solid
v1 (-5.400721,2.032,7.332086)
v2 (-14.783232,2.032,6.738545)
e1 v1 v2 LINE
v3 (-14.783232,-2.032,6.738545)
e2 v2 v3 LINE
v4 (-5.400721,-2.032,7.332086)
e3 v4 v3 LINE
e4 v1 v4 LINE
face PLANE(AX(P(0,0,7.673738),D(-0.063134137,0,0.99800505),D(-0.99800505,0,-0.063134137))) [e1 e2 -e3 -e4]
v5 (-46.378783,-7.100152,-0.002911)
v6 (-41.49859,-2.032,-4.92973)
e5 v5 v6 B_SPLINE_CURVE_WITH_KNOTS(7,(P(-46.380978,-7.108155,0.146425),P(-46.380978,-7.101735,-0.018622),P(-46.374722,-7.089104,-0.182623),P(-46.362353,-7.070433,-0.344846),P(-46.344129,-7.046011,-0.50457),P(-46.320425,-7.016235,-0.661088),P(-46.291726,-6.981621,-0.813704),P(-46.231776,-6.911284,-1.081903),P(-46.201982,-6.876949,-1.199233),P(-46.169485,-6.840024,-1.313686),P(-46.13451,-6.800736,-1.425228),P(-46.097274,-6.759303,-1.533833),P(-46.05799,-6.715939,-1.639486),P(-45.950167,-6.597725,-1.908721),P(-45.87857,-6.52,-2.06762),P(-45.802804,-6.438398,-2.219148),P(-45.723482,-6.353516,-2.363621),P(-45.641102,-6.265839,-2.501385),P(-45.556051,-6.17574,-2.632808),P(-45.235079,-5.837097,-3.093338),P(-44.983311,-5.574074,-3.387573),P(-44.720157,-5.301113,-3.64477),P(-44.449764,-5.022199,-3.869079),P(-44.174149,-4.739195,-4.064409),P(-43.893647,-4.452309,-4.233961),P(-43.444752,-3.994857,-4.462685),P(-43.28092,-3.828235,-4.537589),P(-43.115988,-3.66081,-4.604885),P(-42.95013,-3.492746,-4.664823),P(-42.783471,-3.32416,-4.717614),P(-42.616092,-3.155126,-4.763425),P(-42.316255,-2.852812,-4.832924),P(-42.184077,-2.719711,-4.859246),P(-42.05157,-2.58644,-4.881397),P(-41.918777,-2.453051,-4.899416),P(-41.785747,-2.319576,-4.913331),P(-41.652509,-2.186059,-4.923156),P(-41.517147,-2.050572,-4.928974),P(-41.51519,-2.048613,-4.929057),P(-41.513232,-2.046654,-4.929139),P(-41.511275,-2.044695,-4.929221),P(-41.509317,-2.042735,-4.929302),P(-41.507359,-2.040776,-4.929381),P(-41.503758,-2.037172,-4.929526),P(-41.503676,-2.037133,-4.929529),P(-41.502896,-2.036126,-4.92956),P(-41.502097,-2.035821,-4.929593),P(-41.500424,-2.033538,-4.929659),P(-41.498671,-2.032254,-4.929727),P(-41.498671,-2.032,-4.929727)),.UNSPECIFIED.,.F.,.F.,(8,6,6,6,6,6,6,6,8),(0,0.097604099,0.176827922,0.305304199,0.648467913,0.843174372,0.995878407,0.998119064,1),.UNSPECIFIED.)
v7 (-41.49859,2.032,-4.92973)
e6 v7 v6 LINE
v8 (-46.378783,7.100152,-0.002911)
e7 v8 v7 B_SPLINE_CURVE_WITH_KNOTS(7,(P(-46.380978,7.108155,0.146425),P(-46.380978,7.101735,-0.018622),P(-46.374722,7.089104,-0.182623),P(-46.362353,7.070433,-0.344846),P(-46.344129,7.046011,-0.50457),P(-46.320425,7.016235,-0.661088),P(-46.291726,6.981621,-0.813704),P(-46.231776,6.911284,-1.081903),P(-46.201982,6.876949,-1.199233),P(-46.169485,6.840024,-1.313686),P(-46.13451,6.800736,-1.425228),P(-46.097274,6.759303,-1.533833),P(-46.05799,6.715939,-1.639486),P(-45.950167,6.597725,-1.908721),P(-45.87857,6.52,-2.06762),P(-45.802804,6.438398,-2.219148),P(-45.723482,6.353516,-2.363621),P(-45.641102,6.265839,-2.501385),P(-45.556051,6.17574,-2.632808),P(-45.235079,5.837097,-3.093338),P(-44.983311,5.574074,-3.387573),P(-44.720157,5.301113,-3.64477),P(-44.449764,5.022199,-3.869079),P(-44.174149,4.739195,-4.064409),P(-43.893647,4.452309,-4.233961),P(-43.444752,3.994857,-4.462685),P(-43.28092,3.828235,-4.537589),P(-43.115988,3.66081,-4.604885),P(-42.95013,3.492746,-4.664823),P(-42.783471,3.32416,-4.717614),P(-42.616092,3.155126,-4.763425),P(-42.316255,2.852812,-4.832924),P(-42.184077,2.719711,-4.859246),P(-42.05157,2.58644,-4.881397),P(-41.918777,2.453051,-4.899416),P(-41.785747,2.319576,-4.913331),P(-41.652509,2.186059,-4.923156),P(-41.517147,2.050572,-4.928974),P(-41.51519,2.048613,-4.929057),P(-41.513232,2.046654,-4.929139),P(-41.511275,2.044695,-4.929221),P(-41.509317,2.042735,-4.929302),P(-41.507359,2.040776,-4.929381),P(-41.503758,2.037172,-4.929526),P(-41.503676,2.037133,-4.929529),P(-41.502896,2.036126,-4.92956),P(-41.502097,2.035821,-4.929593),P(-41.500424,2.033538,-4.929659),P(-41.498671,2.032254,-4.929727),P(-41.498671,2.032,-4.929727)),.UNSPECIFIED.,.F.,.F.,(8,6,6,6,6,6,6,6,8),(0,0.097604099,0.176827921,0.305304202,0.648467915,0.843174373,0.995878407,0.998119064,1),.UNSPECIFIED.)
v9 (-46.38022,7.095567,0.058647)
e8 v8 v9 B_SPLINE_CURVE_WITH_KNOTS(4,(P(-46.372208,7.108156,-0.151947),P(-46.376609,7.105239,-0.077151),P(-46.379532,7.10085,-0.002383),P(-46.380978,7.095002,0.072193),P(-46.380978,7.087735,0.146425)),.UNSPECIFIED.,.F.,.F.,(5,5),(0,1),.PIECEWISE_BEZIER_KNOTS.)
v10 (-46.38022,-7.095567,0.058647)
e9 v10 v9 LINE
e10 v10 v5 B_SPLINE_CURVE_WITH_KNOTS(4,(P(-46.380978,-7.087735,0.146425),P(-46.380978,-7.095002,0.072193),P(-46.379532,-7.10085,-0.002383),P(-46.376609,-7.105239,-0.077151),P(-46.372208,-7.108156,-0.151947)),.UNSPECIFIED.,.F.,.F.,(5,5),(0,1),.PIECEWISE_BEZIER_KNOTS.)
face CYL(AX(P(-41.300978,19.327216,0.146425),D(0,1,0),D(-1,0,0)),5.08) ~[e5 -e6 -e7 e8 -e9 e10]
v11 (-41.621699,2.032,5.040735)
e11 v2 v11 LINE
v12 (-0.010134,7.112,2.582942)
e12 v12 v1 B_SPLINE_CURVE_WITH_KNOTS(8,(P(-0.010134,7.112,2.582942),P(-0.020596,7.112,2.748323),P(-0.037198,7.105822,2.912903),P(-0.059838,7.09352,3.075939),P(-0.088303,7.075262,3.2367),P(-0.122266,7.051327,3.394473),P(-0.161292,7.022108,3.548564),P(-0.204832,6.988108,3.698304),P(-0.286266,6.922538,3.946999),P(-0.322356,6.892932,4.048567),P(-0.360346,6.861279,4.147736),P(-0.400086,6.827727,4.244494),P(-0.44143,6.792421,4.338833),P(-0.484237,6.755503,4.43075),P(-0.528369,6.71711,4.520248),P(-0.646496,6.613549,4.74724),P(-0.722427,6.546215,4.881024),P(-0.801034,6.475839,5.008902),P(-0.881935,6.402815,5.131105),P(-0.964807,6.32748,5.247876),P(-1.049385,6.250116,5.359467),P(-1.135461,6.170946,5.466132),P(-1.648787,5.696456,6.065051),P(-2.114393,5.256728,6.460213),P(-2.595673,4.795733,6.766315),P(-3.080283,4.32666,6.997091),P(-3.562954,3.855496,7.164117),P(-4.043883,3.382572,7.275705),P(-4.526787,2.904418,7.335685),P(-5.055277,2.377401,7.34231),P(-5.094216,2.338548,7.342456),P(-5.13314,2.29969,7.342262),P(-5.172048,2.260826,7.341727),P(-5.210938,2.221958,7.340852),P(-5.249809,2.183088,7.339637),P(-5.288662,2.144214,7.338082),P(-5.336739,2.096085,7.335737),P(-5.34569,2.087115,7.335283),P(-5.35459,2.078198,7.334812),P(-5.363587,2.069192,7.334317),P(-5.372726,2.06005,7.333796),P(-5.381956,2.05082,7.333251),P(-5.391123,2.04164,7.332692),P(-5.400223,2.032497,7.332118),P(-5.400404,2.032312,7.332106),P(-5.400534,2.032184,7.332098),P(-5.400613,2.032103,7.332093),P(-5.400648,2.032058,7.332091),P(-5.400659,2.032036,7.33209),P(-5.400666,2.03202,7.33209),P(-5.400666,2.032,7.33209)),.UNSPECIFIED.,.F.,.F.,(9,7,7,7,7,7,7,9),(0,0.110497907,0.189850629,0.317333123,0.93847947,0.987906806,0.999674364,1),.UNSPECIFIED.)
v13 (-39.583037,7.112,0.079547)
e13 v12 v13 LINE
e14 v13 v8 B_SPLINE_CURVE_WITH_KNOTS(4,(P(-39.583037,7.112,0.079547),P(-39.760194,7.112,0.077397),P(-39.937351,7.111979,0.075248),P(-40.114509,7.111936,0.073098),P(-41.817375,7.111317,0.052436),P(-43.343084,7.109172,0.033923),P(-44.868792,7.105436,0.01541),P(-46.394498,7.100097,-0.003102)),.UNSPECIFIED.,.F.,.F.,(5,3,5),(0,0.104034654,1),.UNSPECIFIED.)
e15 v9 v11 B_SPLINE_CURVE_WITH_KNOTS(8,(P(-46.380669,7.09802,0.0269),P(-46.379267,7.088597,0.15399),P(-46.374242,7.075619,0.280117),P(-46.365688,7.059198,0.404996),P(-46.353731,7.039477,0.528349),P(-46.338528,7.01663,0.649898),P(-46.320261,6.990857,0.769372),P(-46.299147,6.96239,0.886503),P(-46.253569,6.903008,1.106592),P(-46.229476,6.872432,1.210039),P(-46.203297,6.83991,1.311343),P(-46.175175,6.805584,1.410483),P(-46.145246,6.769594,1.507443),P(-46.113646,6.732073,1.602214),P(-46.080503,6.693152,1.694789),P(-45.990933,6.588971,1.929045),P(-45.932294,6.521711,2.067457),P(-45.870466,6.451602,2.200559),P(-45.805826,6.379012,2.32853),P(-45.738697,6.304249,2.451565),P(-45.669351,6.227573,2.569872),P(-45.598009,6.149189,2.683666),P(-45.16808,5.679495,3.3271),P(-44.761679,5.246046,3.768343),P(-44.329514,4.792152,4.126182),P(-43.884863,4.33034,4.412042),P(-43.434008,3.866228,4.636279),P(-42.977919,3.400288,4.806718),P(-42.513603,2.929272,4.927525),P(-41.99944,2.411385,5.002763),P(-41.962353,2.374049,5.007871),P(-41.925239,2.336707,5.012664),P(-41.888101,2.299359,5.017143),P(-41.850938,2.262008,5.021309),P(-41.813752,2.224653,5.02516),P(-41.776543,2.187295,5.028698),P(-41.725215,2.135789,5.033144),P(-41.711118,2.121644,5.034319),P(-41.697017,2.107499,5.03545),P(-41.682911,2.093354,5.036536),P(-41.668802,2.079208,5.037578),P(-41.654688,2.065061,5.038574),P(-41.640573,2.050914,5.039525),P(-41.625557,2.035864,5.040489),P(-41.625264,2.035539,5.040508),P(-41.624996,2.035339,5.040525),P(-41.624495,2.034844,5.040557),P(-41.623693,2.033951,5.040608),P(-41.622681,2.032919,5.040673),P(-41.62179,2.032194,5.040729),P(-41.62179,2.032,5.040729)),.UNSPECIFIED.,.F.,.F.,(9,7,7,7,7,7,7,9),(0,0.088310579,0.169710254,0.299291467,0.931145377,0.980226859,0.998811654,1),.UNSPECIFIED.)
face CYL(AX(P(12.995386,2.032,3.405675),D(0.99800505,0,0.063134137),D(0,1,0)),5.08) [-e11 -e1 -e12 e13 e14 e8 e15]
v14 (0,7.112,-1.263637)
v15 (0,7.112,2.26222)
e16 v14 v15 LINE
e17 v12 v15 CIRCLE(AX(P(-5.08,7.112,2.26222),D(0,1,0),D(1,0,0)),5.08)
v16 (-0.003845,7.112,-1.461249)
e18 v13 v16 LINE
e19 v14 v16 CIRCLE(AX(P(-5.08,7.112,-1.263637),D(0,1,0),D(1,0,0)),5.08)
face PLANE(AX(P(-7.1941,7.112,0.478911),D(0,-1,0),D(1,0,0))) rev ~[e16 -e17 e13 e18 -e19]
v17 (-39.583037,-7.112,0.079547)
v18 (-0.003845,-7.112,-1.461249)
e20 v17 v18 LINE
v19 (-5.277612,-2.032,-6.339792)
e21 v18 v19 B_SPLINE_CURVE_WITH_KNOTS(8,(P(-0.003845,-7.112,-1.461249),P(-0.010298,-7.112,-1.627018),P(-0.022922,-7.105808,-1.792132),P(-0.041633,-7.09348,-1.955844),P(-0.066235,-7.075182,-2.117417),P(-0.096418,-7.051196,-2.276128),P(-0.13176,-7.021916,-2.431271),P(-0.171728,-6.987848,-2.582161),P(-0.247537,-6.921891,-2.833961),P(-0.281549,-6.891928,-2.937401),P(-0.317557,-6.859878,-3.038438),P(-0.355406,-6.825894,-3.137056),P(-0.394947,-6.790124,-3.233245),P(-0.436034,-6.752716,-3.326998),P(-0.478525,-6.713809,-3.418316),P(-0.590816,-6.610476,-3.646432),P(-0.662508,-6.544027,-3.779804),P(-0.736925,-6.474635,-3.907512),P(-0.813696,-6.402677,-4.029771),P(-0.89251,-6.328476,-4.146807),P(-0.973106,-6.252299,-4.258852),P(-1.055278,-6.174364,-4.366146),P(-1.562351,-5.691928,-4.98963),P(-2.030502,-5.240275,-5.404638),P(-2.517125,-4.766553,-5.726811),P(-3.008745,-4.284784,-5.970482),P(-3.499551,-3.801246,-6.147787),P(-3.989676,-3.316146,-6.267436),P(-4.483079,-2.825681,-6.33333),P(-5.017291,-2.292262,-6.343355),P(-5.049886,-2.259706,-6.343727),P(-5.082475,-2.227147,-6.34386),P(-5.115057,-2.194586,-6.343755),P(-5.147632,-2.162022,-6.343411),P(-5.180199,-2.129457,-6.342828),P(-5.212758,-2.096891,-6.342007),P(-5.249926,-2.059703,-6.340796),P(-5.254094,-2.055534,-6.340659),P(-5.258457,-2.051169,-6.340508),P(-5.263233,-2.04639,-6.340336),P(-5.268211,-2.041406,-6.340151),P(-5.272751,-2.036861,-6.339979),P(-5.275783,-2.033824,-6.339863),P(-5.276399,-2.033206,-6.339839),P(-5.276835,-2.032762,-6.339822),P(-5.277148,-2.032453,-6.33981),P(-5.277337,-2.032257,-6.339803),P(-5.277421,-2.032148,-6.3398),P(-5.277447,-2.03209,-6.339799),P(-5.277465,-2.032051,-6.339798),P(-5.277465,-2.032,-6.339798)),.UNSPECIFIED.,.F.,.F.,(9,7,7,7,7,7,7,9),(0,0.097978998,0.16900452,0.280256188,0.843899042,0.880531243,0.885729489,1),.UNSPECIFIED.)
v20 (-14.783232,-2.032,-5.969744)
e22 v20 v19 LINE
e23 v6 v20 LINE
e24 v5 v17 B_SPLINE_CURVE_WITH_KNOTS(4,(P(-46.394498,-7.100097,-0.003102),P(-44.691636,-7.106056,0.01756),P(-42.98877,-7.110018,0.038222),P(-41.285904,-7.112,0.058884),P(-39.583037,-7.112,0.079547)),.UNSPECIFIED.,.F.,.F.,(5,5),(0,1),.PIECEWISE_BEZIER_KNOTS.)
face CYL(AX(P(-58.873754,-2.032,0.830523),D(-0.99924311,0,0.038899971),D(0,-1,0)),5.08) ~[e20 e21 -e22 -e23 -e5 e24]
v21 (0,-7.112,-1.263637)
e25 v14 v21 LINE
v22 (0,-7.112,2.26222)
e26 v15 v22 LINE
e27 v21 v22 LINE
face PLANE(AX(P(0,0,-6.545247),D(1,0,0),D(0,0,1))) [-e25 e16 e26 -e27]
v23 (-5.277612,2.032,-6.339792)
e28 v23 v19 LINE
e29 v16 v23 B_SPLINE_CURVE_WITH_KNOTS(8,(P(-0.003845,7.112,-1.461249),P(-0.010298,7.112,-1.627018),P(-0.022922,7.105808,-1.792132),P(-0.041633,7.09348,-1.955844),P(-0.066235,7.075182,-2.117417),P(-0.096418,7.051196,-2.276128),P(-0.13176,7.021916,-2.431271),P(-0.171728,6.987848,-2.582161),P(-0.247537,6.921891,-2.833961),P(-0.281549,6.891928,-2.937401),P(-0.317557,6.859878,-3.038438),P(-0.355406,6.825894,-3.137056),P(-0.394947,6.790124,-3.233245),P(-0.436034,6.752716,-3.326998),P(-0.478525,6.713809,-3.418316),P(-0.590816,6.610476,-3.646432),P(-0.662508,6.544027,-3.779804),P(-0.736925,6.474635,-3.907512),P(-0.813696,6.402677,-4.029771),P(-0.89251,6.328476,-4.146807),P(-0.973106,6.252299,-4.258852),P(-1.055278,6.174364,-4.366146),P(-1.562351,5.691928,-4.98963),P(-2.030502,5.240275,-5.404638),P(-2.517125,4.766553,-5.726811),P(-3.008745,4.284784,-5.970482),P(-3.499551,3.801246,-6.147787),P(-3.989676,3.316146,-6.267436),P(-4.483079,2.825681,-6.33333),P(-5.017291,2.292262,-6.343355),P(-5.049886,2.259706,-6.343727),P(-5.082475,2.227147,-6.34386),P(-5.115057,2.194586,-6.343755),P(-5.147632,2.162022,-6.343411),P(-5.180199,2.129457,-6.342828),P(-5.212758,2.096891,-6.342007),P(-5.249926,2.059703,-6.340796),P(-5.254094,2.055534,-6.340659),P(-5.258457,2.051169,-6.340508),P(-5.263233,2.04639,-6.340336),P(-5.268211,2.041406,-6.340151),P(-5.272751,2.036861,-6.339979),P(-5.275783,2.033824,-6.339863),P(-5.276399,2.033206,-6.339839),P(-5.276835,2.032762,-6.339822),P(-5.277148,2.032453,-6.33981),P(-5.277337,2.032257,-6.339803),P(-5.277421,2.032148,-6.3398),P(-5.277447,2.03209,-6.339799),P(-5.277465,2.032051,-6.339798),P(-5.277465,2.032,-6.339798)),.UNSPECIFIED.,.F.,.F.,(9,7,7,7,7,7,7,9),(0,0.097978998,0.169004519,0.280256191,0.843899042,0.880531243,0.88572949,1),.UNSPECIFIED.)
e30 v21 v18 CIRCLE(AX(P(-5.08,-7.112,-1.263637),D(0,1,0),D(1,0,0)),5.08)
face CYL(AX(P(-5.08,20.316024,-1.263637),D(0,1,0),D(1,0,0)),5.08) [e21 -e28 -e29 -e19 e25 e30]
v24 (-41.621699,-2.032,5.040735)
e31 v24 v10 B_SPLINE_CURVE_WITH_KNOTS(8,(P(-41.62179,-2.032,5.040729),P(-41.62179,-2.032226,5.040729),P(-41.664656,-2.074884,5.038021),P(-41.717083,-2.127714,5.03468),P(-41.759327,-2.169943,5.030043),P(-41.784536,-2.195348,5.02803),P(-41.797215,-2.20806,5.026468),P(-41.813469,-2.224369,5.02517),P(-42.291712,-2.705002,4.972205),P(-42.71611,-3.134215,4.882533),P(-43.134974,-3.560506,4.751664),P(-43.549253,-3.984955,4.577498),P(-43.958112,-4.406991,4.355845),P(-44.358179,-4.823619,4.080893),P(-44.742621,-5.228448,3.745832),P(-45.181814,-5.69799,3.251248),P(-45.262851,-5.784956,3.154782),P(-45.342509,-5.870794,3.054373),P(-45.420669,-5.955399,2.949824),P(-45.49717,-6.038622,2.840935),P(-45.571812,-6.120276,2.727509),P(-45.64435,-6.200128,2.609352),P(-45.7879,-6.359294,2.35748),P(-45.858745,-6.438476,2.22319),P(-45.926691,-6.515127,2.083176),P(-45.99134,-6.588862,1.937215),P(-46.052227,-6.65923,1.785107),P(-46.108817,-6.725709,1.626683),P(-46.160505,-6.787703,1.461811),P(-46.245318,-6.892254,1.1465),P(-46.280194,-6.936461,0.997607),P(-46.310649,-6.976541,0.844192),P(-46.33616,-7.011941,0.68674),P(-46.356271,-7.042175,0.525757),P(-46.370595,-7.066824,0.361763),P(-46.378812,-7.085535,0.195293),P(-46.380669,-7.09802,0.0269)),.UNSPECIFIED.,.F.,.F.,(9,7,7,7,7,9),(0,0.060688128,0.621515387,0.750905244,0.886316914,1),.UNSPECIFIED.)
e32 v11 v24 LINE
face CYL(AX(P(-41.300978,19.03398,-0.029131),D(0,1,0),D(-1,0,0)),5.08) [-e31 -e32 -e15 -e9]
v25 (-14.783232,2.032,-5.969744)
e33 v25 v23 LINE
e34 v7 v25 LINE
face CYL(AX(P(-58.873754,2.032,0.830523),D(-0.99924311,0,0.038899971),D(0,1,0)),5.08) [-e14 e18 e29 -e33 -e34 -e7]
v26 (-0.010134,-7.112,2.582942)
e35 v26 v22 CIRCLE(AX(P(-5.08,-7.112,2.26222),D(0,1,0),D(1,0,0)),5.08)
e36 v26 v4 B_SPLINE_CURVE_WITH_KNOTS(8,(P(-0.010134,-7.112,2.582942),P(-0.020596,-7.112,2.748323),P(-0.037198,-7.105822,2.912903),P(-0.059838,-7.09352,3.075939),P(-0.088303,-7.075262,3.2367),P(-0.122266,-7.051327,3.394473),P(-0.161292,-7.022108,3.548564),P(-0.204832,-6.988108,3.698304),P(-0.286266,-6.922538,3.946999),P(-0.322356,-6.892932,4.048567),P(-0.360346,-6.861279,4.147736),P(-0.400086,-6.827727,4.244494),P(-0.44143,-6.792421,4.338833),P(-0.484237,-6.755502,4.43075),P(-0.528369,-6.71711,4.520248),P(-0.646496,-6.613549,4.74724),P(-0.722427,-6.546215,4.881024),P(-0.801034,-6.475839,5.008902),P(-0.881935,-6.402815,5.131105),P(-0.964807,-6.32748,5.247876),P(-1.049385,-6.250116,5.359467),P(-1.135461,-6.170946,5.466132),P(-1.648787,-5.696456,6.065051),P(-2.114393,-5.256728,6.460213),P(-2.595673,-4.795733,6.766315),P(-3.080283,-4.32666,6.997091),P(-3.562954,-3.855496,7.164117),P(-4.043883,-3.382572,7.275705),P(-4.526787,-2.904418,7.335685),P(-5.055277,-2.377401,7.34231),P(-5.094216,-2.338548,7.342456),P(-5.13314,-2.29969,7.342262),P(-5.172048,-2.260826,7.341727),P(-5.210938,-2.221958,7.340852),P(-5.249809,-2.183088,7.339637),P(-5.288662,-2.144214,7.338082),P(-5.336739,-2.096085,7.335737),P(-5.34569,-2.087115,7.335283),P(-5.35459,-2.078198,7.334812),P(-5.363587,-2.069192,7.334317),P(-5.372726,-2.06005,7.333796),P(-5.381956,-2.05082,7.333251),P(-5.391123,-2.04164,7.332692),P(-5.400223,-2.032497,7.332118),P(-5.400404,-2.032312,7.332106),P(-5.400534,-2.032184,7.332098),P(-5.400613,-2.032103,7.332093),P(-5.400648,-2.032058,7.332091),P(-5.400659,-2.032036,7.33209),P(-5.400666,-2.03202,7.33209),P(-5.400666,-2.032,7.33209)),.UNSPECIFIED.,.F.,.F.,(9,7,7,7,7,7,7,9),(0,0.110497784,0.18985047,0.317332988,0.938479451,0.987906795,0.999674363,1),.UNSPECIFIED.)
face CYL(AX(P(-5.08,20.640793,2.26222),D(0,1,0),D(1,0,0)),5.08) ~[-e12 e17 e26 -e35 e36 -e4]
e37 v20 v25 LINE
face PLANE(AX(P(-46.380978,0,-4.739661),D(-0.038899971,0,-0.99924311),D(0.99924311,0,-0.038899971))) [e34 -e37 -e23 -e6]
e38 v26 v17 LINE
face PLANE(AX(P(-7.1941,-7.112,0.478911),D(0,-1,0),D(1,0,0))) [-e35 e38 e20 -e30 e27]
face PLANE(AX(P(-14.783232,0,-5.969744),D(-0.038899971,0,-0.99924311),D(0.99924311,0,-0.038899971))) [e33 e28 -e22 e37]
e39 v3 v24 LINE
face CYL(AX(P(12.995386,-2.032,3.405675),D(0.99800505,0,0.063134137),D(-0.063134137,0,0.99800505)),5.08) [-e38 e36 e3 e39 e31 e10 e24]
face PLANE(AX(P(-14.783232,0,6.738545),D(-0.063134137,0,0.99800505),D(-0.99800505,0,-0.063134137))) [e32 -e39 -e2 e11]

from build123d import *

# Parameters (mm, degrees)
F1_DEPTH      = 7.112
F1_DEPTH_BACK = 7.112
F2_T1_DEPTH   = 38.654431888
F2_T3_DEPTH   = 71.8161099821
F2_T5_DEPTH   = 40.6320472649
F2_T7_DEPTH   = 71.8736907455
F2_T9_DEPTH   = 38.0679604185
F2_T11_DEPTH  = 41.2815855973


# Not quite as in the source:
# - a fillet or chamfer that OpenCascade refuses, or shapes differently, is made with other operations: its cross-section is extruded or revolved along the edge and cut away or added


with BuildPart() as f1:
    # F0 (on Front) → F1 (new body, two sides)
    with BuildSketch(Plane.XZ) as f1_sk:
        Polygon((0, 7.673737593), (-14.7832315415, 6.7385453665), (-14.7832315415, -5.9697437044), (0, -6.5452465788), align=None)
        Polygon((-14.7832315415, 6.7385453665), (-46.3809780777, 4.7396612354), (-46.3809780777, -4.7396612354), (-14.7832315415, -5.9697437044), align=None)
    extrude(amount=F1_DEPTH)
    extrude(f1_sk.sketch, amount=-F1_DEPTH_BACK)

    # F2: fillet of radius 5.08 on 8 edges, made by hand

    # F2_s2 → F2_t1 (cut)
    with BuildSketch(Plane.XZ.offset(-19.327215944)):
        with BuildLine():
            ThreePointArc((-46.3809780777, 0.1464251422), (-44.9622803199, -3.37511797), (-41.4985899316, -4.9297298549))
            Line((-41.4985899316, -4.9297298549), (-46.3809780777, -4.7396612354))
            Line((-46.3809780777, -4.7396612354), (-46.3809780777, 0.1464251422))
        make_face()
    extrude(amount=F2_T1_DEPTH, mode=Mode.SUBTRACT)

    # F2_s4 → F2_t3 (cut)
    with BuildSketch(Plane(origin=(-58.8169483786, 0, 2.2897106602), x_dir=(0, 1, 0), z_dir=(0.9992431097, 0, -0.0388999712))):
        with BuildLine():
            ThreePointArc((-7.112, -1.460292545), (-5.6241024484, -5.0523949934), (-2.032, -6.540292545))
            Line((-2.032, -6.540292545), (-7.112, -6.540292545))
            Line((-7.112, -6.540292545), (-7.112, -1.460292545))
        make_face()
        with BuildLine():
            ThreePointArc((7.112, -1.460292545), (5.6241024484, -5.0523949934), (2.032, -6.540292545))
            Line((2.032, -6.540292545), (7.112, -6.540292545))
            Line((7.112, -6.540292545), (7.112, -1.460292545))
        make_face()
    extrude(amount=F2_T3_DEPTH, mode=Mode.SUBTRACT)

    # F2_s6 → F2_t5 (cut)
    with BuildSketch(Plane.XZ.offset(-20.3160236325)):
        with BuildLine():
            ThreePointArc((0, -1.2636371258), (-1.5584568878, -4.924939368), (-5.2776118539, -6.3397921229))
            Line((-5.2776118539, -6.3397921229), (0, -6.5452465788))
            Line((0, -6.5452465788), (0, -1.2636371258))
        make_face()
    extrude(amount=F2_T5_DEPTH, mode=Mode.SUBTRACT)

    # F2_s8 → F2_t7 (cut)
    with BuildSketch(Plane(origin=(13.1581724385, 0, 0.8323904381), x_dir=(0, 1, 0), z_dir=(-0.9980050505, 0, -0.063134137))):
        with BuildLine():
            ThreePointArc((-2.032, -7.6584288737), (-5.6241024484, -6.1705313222), (-7.112, -2.5784288737))
            Line((-7.112, -2.5784288737), (-7.112, -7.6584288737))
            Line((-7.112, -7.6584288737), (-2.032, -7.6584288737))
        make_face()
        with BuildLine():
            ThreePointArc((7.112, -2.5784288737), (5.6241024484, -6.1705313222), (2.032, -7.6584288737))
            Line((2.032, -7.6584288737), (7.112, -7.6584288737))
            Line((7.112, -7.6584288737), (7.112, -2.5784288737))
        make_face()
    extrude(amount=F2_T7_DEPTH, mode=Mode.SUBTRACT)

    # F2_s10 → F2_t9 (cut)
    with BuildSketch(Plane.XZ.offset(-19.0339802092)):
        with BuildLine():
            ThreePointArc((-46.3809780777, -0.0291308483), (-45.0047373026, 3.4477308981), (-41.6216994935, 5.040734808))
            Line((-41.6216994935, 5.040734808), (-46.3809780777, 4.7396612354))
            Line((-46.3809780777, 4.7396612354), (-46.3809780777, -0.0291308483))
        make_face()
    extrude(amount=F2_T9_DEPTH, mode=Mode.SUBTRACT)

    # F2_s12 → F2_t11 (cut)
    with BuildSketch(Plane.XZ.offset(-20.6407927986)):
        with BuildLine():
            ThreePointArc((0, 2.2622204735), (-1.6031382536, 5.9659796985), (-5.4007214159, 7.3320861299))
            Line((-5.4007214159, 7.3320861299), (0, 7.673737593))
            Line((0, 7.673737593), (0, 2.2622204735))
        make_face()
    extrude(amount=F2_T11_DEPTH, mode=Mode.SUBTRACT)


solid = f1.part
